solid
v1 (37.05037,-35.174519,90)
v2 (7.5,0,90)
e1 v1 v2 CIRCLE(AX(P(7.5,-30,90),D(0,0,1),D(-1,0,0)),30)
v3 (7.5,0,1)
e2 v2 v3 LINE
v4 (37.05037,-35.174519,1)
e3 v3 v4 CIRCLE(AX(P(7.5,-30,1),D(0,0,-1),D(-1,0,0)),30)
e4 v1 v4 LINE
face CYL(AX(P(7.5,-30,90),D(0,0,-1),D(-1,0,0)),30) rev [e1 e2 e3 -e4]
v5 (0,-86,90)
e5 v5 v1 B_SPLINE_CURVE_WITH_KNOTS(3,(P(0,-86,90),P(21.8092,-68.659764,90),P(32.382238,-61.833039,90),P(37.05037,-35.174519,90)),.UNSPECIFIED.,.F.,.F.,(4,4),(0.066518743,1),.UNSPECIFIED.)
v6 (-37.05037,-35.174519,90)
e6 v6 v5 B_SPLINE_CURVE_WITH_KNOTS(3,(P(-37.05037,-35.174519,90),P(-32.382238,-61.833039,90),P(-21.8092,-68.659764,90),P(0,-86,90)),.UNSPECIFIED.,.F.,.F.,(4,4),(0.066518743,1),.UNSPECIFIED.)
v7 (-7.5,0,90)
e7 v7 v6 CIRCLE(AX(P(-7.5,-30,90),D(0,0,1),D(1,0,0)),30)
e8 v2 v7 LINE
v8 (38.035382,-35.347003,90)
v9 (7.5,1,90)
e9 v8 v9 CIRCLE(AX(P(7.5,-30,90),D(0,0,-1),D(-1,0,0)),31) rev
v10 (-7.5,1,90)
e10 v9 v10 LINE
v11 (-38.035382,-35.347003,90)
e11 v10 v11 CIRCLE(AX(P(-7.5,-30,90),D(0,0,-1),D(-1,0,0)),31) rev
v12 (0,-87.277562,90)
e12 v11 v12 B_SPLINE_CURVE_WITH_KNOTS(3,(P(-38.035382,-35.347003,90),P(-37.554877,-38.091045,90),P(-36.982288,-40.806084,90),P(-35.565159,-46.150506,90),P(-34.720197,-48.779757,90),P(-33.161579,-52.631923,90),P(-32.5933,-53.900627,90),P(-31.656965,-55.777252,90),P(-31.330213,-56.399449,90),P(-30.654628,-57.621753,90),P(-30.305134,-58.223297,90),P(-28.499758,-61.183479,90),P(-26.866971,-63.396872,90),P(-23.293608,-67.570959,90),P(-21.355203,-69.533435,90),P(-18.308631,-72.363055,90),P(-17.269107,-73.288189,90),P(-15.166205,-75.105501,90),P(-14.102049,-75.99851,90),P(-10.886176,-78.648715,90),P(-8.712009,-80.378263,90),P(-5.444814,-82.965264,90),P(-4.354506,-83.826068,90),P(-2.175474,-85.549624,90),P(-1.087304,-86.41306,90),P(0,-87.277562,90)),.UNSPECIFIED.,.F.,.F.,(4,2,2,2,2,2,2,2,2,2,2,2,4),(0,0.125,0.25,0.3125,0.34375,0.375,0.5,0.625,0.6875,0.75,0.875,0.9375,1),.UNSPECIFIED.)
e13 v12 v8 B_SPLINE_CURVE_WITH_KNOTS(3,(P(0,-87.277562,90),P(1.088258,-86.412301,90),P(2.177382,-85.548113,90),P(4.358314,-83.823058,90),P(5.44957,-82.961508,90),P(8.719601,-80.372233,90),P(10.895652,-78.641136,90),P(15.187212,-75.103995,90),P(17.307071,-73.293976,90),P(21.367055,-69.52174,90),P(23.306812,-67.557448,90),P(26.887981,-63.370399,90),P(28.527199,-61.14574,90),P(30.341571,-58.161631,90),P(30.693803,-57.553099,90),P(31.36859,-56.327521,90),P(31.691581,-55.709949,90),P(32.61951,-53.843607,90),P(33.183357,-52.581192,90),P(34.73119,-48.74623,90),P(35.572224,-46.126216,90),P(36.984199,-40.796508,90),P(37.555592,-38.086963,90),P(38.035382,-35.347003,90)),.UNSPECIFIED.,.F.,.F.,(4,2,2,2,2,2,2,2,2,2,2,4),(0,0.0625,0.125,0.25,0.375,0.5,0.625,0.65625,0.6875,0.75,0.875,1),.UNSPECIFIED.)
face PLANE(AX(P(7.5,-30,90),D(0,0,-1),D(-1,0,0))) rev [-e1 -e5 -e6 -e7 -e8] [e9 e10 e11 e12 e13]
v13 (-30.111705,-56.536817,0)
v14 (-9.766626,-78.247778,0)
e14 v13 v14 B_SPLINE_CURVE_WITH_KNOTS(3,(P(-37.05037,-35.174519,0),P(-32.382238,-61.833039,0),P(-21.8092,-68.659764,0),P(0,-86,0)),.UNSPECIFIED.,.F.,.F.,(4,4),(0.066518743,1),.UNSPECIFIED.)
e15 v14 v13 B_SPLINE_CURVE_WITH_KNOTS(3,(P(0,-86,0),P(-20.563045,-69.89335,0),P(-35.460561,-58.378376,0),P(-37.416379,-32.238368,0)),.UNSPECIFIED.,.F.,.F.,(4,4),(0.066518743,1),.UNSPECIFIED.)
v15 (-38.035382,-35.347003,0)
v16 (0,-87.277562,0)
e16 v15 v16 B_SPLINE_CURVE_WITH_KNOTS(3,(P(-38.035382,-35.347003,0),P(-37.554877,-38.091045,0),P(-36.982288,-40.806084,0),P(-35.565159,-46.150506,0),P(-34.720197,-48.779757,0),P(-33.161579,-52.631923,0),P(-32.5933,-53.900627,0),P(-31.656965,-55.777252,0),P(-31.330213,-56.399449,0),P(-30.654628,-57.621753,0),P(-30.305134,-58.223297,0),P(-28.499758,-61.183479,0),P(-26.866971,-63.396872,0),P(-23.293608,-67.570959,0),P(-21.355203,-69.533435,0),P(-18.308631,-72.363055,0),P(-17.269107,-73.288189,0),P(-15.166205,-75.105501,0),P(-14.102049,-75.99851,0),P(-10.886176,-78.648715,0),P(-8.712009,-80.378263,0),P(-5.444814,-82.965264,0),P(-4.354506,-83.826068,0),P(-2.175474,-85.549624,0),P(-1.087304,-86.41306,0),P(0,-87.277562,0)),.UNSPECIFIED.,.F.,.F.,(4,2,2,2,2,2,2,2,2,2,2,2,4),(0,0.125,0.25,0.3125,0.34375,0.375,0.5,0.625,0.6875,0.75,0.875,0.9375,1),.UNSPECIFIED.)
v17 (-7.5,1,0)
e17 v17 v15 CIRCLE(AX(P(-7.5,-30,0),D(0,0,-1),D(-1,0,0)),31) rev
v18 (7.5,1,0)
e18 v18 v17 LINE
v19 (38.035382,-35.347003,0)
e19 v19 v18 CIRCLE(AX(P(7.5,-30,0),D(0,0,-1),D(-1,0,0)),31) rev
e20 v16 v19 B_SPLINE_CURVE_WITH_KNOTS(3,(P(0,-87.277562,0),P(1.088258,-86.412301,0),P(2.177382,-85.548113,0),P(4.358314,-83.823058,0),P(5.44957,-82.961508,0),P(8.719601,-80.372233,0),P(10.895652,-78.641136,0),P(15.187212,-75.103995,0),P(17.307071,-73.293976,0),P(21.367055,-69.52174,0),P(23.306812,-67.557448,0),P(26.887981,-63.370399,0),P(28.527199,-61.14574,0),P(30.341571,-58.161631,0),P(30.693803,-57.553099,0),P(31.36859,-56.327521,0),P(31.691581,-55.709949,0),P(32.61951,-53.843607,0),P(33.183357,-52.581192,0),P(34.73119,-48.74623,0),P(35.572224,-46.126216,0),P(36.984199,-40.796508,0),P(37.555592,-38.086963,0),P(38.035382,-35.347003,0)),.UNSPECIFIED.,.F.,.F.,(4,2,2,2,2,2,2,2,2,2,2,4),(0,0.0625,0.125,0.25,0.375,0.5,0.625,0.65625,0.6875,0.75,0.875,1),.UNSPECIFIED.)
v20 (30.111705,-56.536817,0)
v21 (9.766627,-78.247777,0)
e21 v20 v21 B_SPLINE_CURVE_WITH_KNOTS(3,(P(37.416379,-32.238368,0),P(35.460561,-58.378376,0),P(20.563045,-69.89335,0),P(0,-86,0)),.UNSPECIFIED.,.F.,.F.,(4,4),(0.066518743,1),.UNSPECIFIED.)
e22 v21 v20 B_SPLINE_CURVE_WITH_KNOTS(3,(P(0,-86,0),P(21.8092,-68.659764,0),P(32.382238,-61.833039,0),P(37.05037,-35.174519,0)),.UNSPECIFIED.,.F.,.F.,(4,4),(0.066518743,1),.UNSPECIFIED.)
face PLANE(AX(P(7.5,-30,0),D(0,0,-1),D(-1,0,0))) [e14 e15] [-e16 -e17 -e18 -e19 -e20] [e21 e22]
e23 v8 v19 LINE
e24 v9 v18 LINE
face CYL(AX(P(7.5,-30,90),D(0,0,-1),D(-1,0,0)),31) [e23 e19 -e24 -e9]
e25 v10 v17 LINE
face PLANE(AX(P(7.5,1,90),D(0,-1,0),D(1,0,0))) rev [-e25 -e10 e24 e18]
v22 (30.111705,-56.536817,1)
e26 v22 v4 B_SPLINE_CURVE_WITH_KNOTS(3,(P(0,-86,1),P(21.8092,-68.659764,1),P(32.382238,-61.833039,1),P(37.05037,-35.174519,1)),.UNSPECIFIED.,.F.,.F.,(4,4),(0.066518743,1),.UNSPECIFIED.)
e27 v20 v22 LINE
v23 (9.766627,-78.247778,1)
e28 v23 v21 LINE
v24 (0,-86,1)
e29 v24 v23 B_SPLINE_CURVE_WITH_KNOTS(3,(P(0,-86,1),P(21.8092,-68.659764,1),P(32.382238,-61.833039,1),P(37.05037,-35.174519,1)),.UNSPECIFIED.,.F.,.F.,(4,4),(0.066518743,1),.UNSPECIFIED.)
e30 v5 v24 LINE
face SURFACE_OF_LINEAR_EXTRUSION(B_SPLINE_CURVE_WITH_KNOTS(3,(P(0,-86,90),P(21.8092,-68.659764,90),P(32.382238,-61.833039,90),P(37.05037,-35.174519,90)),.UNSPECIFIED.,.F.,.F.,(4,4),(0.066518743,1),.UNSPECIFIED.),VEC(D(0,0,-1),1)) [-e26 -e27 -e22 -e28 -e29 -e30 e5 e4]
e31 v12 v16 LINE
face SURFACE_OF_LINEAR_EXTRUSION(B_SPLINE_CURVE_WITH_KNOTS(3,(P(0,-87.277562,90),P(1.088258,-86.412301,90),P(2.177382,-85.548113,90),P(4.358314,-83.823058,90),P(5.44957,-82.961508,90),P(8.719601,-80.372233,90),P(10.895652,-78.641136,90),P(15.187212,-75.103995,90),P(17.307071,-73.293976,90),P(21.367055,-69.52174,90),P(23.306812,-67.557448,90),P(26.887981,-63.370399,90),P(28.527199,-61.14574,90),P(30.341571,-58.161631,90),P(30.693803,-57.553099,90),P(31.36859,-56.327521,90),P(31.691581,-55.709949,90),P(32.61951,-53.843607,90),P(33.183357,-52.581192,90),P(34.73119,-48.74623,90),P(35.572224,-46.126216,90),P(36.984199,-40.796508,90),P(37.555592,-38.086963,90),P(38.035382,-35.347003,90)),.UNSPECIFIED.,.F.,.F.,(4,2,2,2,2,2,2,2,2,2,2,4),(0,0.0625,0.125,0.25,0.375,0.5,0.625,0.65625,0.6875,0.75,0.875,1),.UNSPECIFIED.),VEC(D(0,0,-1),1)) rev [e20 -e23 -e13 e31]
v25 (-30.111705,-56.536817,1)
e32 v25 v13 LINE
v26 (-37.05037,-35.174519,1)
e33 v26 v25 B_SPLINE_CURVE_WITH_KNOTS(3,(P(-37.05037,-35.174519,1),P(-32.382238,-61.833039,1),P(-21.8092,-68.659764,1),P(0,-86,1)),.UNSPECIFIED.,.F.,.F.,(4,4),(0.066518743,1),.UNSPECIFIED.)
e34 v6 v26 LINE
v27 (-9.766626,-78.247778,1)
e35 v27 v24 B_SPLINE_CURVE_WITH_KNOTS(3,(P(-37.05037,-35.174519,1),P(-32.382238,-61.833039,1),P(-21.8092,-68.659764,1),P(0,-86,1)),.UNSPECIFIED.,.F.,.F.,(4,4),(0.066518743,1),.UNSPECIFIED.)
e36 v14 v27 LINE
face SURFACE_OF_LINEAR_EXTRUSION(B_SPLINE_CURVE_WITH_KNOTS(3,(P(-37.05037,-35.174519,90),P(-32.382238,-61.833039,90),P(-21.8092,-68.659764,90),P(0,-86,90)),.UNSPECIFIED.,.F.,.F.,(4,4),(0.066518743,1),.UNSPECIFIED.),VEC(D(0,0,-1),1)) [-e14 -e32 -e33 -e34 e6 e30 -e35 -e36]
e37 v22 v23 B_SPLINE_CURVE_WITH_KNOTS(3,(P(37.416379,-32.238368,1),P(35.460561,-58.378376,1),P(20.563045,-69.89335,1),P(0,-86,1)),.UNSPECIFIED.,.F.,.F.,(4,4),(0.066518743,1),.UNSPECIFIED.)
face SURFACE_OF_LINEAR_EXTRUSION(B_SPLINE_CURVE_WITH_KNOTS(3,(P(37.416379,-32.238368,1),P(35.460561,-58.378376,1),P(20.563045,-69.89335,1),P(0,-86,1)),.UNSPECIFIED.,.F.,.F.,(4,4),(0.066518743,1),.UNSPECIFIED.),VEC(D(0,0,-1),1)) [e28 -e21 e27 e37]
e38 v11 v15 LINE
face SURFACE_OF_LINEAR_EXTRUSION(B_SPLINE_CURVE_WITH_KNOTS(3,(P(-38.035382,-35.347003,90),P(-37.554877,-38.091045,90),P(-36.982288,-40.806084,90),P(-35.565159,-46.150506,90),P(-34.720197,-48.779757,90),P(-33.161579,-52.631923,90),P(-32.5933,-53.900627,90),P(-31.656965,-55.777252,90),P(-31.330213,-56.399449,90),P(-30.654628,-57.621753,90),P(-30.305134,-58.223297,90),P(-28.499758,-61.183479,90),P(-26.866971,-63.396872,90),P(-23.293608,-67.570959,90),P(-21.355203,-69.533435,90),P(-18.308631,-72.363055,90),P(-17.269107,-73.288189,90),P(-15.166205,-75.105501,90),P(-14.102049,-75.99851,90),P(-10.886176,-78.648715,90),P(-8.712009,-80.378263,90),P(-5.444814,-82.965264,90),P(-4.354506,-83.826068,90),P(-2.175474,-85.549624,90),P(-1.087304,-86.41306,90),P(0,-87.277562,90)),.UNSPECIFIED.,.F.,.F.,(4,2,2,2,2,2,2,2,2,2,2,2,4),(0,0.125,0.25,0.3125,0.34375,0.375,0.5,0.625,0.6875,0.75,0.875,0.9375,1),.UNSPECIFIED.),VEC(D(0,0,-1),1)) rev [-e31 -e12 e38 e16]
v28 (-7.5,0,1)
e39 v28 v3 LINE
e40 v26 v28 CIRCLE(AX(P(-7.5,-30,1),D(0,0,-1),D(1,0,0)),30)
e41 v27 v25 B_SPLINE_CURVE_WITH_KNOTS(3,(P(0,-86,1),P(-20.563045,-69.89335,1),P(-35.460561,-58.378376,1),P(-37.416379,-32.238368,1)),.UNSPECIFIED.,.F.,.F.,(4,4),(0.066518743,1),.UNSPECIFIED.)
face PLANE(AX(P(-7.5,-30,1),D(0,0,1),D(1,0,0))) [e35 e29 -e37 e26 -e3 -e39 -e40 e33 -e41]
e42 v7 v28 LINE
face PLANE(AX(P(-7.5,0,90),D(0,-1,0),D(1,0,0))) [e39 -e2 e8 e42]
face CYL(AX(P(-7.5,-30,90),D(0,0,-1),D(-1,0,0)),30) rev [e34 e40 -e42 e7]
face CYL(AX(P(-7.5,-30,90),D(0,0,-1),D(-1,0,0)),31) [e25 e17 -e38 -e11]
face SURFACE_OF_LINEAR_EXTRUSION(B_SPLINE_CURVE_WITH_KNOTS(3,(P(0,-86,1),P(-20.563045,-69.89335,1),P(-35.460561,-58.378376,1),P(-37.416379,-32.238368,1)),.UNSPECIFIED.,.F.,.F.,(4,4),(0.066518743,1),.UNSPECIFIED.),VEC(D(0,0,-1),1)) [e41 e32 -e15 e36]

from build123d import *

# Parameters (mm, degrees)
EXTRUDE_THIN1_DEPTH = 90
BOSS_EXTRUDE2_DEPTH = 1


# Read off the part's stored shape, not the designer's step: Extrude-Thin1
with BuildPart() as part:
    # Extrude-Thin1 outline → Extrude-Thin1 (new body)
    with BuildSketch(Plane.XY):
        with BuildLine():
            ThreePointArc((38.035382168, -35.347002514), (31.235596453, -10.059552135), (7.5, 1))
            Line((7.5, 1), (-7.5, 1))
            ThreePointArc((-7.5, 1), (-31.235596453, -10.059552135), (-38.035382168, -35.347002514))
            add(Edge.make_bspline(
                [(-38.035382168, -35.347002514), (-37.554877275, -38.091044712), (-36.982288394, -40.80608362), (-35.565158765, -46.150505954), (-34.720196751, -48.779756695), (-33.161578556, -52.631922641), (-32.593300375, -53.900626917), (-31.656964897, -55.777251982), (-31.330213147, -56.399449481), (-30.654628096, -57.62175288), (-30.305133925, -58.2232973), (-28.499758373, -61.183478516), (-26.866970732, -63.396871822), (-23.293608141, -67.570959051), (-21.3552031, -69.53343451), (-18.308631284, -72.363055335), (-17.269106946, -73.288189322), (-15.166205404, -75.105501428), (-14.102048687, -75.998509971), (-10.886176236, -78.648715419), (-8.712008649, -80.378262626), (-5.44481379, -82.965263978), (-4.354506385, -83.826067669), (-2.175474488, -85.549624425), (-1.08730397, -86.413059715), (0, -87.277562168)],
                knots=[0, 0, 0, 0, 0.125, 0.125, 0.25, 0.25, 0.3125, 0.3125, 0.34375, 0.34375, 0.375, 0.375, 0.5, 0.5, 0.625, 0.625, 0.6875, 0.6875, 0.75, 0.75, 0.875, 0.875, 0.9375, 0.9375, 1, 1, 1, 1], degree=3))
            add(Edge.make_bspline(
                [(0, -87.277562168), (1.08825792, -86.412301242), (2.17738223, -85.548112852), (4.358314452, -83.823058195), (5.449569509, -82.961507531), (8.719600502, -80.37223287), (10.895651555, -78.64113564), (15.18721231, -75.103994895), (17.307070745, -73.293975682), (21.367054903, -69.521739888), (23.306811774, -67.557448149), (26.887981037, -63.370398667), (28.527198921, -61.145739745), (30.341570945, -58.161630502), (30.693803217, -57.553099071), (31.368590392, -56.327520761), (31.691581341, -55.709949334), (32.619510062, -53.843606709), (33.183356969, -52.581191644), (34.731190275, -48.746229651), (35.57222373, -46.126216436), (36.984199031, -40.79650843), (37.555591946, -38.086963412), (38.035382168, -35.347002514)],
                knots=[0, 0, 0, 0, 0.0625, 0.0625, 0.125, 0.125, 0.25, 0.25, 0.375, 0.375, 0.5, 0.5, 0.625, 0.625, 0.65625, 0.65625, 0.6875, 0.6875, 0.75, 0.75, 0.875, 0.875, 1, 1, 1, 1], degree=3))
        make_face()
        with BuildLine():
            Line((-7.5, 0), (7.5, 0))
            ThreePointArc((7.5, 0), (30.469932051, -10.702792389), (37.05036984, -35.174518562))
            add(Edge.make_bspline(
                [(0, -86), (21.809200373, -68.659764212), (32.382238463, -61.833038962), (37.05036984, -35.174518562)],
                knots=[0.066518743, 0.066518743, 0.066518743, 0.066518743, 1, 1, 1, 1], degree=3))
            add(Edge.make_bspline(
                [(-37.05036984, -35.174518562), (-32.382238463, -61.833038961), (-21.809200373, -68.659764214), (0, -86)],
                knots=[0.066518743, 0.066518743, 0.066518743, 0.066518743, 1, 1, 1, 1], degree=3))
            ThreePointArc((-37.05036984, -35.174518562), (-30.469932051, -10.702792389), (-7.5, 0))
        make_face(mode=Mode.SUBTRACT)
    extrude(amount=EXTRUDE_THIN1_DEPTH)

    # Sketch3 → Boss-Extrude2 (add)
    with BuildSketch(Plane(origin=(0, 0, 0), x_dir=(-1, 0, 0), z_dir=(0, 0, -1))):
        with BuildLine():
            Line((-7.5, 0), (7.5, 0))
            ThreePointArc((7.5, 0), (29.490350716, -9.59351879), (37.41637858, -32.238368308))
            add(Edge.make_bspline(
                [(37.41637858, -32.238368308), (35.460561449, -58.378376411), (20.563045318, -69.893350067), (0, -86)],
                knots=[0.066518743, 0.066518743, 0.066518743, 0.066518743, 1, 1, 1, 1], degree=3))
            add(Edge.make_bspline(
                [(-37.41637858, -32.238368308), (-35.460561449, -58.378376411), (-20.563045318, -69.893350067), (0, -86)],
                knots=[0.066518743, 0.066518743, 0.066518743, 0.066518743, 1, 1, 1, 1], degree=3))
            ThreePointArc((-37.41637858, -32.238368308), (-29.490350716, -9.59351879), (-7.5, 0))
        make_face()
    extrude(amount=-BOSS_EXTRUDE2_DEPTH)


solid = part.part
